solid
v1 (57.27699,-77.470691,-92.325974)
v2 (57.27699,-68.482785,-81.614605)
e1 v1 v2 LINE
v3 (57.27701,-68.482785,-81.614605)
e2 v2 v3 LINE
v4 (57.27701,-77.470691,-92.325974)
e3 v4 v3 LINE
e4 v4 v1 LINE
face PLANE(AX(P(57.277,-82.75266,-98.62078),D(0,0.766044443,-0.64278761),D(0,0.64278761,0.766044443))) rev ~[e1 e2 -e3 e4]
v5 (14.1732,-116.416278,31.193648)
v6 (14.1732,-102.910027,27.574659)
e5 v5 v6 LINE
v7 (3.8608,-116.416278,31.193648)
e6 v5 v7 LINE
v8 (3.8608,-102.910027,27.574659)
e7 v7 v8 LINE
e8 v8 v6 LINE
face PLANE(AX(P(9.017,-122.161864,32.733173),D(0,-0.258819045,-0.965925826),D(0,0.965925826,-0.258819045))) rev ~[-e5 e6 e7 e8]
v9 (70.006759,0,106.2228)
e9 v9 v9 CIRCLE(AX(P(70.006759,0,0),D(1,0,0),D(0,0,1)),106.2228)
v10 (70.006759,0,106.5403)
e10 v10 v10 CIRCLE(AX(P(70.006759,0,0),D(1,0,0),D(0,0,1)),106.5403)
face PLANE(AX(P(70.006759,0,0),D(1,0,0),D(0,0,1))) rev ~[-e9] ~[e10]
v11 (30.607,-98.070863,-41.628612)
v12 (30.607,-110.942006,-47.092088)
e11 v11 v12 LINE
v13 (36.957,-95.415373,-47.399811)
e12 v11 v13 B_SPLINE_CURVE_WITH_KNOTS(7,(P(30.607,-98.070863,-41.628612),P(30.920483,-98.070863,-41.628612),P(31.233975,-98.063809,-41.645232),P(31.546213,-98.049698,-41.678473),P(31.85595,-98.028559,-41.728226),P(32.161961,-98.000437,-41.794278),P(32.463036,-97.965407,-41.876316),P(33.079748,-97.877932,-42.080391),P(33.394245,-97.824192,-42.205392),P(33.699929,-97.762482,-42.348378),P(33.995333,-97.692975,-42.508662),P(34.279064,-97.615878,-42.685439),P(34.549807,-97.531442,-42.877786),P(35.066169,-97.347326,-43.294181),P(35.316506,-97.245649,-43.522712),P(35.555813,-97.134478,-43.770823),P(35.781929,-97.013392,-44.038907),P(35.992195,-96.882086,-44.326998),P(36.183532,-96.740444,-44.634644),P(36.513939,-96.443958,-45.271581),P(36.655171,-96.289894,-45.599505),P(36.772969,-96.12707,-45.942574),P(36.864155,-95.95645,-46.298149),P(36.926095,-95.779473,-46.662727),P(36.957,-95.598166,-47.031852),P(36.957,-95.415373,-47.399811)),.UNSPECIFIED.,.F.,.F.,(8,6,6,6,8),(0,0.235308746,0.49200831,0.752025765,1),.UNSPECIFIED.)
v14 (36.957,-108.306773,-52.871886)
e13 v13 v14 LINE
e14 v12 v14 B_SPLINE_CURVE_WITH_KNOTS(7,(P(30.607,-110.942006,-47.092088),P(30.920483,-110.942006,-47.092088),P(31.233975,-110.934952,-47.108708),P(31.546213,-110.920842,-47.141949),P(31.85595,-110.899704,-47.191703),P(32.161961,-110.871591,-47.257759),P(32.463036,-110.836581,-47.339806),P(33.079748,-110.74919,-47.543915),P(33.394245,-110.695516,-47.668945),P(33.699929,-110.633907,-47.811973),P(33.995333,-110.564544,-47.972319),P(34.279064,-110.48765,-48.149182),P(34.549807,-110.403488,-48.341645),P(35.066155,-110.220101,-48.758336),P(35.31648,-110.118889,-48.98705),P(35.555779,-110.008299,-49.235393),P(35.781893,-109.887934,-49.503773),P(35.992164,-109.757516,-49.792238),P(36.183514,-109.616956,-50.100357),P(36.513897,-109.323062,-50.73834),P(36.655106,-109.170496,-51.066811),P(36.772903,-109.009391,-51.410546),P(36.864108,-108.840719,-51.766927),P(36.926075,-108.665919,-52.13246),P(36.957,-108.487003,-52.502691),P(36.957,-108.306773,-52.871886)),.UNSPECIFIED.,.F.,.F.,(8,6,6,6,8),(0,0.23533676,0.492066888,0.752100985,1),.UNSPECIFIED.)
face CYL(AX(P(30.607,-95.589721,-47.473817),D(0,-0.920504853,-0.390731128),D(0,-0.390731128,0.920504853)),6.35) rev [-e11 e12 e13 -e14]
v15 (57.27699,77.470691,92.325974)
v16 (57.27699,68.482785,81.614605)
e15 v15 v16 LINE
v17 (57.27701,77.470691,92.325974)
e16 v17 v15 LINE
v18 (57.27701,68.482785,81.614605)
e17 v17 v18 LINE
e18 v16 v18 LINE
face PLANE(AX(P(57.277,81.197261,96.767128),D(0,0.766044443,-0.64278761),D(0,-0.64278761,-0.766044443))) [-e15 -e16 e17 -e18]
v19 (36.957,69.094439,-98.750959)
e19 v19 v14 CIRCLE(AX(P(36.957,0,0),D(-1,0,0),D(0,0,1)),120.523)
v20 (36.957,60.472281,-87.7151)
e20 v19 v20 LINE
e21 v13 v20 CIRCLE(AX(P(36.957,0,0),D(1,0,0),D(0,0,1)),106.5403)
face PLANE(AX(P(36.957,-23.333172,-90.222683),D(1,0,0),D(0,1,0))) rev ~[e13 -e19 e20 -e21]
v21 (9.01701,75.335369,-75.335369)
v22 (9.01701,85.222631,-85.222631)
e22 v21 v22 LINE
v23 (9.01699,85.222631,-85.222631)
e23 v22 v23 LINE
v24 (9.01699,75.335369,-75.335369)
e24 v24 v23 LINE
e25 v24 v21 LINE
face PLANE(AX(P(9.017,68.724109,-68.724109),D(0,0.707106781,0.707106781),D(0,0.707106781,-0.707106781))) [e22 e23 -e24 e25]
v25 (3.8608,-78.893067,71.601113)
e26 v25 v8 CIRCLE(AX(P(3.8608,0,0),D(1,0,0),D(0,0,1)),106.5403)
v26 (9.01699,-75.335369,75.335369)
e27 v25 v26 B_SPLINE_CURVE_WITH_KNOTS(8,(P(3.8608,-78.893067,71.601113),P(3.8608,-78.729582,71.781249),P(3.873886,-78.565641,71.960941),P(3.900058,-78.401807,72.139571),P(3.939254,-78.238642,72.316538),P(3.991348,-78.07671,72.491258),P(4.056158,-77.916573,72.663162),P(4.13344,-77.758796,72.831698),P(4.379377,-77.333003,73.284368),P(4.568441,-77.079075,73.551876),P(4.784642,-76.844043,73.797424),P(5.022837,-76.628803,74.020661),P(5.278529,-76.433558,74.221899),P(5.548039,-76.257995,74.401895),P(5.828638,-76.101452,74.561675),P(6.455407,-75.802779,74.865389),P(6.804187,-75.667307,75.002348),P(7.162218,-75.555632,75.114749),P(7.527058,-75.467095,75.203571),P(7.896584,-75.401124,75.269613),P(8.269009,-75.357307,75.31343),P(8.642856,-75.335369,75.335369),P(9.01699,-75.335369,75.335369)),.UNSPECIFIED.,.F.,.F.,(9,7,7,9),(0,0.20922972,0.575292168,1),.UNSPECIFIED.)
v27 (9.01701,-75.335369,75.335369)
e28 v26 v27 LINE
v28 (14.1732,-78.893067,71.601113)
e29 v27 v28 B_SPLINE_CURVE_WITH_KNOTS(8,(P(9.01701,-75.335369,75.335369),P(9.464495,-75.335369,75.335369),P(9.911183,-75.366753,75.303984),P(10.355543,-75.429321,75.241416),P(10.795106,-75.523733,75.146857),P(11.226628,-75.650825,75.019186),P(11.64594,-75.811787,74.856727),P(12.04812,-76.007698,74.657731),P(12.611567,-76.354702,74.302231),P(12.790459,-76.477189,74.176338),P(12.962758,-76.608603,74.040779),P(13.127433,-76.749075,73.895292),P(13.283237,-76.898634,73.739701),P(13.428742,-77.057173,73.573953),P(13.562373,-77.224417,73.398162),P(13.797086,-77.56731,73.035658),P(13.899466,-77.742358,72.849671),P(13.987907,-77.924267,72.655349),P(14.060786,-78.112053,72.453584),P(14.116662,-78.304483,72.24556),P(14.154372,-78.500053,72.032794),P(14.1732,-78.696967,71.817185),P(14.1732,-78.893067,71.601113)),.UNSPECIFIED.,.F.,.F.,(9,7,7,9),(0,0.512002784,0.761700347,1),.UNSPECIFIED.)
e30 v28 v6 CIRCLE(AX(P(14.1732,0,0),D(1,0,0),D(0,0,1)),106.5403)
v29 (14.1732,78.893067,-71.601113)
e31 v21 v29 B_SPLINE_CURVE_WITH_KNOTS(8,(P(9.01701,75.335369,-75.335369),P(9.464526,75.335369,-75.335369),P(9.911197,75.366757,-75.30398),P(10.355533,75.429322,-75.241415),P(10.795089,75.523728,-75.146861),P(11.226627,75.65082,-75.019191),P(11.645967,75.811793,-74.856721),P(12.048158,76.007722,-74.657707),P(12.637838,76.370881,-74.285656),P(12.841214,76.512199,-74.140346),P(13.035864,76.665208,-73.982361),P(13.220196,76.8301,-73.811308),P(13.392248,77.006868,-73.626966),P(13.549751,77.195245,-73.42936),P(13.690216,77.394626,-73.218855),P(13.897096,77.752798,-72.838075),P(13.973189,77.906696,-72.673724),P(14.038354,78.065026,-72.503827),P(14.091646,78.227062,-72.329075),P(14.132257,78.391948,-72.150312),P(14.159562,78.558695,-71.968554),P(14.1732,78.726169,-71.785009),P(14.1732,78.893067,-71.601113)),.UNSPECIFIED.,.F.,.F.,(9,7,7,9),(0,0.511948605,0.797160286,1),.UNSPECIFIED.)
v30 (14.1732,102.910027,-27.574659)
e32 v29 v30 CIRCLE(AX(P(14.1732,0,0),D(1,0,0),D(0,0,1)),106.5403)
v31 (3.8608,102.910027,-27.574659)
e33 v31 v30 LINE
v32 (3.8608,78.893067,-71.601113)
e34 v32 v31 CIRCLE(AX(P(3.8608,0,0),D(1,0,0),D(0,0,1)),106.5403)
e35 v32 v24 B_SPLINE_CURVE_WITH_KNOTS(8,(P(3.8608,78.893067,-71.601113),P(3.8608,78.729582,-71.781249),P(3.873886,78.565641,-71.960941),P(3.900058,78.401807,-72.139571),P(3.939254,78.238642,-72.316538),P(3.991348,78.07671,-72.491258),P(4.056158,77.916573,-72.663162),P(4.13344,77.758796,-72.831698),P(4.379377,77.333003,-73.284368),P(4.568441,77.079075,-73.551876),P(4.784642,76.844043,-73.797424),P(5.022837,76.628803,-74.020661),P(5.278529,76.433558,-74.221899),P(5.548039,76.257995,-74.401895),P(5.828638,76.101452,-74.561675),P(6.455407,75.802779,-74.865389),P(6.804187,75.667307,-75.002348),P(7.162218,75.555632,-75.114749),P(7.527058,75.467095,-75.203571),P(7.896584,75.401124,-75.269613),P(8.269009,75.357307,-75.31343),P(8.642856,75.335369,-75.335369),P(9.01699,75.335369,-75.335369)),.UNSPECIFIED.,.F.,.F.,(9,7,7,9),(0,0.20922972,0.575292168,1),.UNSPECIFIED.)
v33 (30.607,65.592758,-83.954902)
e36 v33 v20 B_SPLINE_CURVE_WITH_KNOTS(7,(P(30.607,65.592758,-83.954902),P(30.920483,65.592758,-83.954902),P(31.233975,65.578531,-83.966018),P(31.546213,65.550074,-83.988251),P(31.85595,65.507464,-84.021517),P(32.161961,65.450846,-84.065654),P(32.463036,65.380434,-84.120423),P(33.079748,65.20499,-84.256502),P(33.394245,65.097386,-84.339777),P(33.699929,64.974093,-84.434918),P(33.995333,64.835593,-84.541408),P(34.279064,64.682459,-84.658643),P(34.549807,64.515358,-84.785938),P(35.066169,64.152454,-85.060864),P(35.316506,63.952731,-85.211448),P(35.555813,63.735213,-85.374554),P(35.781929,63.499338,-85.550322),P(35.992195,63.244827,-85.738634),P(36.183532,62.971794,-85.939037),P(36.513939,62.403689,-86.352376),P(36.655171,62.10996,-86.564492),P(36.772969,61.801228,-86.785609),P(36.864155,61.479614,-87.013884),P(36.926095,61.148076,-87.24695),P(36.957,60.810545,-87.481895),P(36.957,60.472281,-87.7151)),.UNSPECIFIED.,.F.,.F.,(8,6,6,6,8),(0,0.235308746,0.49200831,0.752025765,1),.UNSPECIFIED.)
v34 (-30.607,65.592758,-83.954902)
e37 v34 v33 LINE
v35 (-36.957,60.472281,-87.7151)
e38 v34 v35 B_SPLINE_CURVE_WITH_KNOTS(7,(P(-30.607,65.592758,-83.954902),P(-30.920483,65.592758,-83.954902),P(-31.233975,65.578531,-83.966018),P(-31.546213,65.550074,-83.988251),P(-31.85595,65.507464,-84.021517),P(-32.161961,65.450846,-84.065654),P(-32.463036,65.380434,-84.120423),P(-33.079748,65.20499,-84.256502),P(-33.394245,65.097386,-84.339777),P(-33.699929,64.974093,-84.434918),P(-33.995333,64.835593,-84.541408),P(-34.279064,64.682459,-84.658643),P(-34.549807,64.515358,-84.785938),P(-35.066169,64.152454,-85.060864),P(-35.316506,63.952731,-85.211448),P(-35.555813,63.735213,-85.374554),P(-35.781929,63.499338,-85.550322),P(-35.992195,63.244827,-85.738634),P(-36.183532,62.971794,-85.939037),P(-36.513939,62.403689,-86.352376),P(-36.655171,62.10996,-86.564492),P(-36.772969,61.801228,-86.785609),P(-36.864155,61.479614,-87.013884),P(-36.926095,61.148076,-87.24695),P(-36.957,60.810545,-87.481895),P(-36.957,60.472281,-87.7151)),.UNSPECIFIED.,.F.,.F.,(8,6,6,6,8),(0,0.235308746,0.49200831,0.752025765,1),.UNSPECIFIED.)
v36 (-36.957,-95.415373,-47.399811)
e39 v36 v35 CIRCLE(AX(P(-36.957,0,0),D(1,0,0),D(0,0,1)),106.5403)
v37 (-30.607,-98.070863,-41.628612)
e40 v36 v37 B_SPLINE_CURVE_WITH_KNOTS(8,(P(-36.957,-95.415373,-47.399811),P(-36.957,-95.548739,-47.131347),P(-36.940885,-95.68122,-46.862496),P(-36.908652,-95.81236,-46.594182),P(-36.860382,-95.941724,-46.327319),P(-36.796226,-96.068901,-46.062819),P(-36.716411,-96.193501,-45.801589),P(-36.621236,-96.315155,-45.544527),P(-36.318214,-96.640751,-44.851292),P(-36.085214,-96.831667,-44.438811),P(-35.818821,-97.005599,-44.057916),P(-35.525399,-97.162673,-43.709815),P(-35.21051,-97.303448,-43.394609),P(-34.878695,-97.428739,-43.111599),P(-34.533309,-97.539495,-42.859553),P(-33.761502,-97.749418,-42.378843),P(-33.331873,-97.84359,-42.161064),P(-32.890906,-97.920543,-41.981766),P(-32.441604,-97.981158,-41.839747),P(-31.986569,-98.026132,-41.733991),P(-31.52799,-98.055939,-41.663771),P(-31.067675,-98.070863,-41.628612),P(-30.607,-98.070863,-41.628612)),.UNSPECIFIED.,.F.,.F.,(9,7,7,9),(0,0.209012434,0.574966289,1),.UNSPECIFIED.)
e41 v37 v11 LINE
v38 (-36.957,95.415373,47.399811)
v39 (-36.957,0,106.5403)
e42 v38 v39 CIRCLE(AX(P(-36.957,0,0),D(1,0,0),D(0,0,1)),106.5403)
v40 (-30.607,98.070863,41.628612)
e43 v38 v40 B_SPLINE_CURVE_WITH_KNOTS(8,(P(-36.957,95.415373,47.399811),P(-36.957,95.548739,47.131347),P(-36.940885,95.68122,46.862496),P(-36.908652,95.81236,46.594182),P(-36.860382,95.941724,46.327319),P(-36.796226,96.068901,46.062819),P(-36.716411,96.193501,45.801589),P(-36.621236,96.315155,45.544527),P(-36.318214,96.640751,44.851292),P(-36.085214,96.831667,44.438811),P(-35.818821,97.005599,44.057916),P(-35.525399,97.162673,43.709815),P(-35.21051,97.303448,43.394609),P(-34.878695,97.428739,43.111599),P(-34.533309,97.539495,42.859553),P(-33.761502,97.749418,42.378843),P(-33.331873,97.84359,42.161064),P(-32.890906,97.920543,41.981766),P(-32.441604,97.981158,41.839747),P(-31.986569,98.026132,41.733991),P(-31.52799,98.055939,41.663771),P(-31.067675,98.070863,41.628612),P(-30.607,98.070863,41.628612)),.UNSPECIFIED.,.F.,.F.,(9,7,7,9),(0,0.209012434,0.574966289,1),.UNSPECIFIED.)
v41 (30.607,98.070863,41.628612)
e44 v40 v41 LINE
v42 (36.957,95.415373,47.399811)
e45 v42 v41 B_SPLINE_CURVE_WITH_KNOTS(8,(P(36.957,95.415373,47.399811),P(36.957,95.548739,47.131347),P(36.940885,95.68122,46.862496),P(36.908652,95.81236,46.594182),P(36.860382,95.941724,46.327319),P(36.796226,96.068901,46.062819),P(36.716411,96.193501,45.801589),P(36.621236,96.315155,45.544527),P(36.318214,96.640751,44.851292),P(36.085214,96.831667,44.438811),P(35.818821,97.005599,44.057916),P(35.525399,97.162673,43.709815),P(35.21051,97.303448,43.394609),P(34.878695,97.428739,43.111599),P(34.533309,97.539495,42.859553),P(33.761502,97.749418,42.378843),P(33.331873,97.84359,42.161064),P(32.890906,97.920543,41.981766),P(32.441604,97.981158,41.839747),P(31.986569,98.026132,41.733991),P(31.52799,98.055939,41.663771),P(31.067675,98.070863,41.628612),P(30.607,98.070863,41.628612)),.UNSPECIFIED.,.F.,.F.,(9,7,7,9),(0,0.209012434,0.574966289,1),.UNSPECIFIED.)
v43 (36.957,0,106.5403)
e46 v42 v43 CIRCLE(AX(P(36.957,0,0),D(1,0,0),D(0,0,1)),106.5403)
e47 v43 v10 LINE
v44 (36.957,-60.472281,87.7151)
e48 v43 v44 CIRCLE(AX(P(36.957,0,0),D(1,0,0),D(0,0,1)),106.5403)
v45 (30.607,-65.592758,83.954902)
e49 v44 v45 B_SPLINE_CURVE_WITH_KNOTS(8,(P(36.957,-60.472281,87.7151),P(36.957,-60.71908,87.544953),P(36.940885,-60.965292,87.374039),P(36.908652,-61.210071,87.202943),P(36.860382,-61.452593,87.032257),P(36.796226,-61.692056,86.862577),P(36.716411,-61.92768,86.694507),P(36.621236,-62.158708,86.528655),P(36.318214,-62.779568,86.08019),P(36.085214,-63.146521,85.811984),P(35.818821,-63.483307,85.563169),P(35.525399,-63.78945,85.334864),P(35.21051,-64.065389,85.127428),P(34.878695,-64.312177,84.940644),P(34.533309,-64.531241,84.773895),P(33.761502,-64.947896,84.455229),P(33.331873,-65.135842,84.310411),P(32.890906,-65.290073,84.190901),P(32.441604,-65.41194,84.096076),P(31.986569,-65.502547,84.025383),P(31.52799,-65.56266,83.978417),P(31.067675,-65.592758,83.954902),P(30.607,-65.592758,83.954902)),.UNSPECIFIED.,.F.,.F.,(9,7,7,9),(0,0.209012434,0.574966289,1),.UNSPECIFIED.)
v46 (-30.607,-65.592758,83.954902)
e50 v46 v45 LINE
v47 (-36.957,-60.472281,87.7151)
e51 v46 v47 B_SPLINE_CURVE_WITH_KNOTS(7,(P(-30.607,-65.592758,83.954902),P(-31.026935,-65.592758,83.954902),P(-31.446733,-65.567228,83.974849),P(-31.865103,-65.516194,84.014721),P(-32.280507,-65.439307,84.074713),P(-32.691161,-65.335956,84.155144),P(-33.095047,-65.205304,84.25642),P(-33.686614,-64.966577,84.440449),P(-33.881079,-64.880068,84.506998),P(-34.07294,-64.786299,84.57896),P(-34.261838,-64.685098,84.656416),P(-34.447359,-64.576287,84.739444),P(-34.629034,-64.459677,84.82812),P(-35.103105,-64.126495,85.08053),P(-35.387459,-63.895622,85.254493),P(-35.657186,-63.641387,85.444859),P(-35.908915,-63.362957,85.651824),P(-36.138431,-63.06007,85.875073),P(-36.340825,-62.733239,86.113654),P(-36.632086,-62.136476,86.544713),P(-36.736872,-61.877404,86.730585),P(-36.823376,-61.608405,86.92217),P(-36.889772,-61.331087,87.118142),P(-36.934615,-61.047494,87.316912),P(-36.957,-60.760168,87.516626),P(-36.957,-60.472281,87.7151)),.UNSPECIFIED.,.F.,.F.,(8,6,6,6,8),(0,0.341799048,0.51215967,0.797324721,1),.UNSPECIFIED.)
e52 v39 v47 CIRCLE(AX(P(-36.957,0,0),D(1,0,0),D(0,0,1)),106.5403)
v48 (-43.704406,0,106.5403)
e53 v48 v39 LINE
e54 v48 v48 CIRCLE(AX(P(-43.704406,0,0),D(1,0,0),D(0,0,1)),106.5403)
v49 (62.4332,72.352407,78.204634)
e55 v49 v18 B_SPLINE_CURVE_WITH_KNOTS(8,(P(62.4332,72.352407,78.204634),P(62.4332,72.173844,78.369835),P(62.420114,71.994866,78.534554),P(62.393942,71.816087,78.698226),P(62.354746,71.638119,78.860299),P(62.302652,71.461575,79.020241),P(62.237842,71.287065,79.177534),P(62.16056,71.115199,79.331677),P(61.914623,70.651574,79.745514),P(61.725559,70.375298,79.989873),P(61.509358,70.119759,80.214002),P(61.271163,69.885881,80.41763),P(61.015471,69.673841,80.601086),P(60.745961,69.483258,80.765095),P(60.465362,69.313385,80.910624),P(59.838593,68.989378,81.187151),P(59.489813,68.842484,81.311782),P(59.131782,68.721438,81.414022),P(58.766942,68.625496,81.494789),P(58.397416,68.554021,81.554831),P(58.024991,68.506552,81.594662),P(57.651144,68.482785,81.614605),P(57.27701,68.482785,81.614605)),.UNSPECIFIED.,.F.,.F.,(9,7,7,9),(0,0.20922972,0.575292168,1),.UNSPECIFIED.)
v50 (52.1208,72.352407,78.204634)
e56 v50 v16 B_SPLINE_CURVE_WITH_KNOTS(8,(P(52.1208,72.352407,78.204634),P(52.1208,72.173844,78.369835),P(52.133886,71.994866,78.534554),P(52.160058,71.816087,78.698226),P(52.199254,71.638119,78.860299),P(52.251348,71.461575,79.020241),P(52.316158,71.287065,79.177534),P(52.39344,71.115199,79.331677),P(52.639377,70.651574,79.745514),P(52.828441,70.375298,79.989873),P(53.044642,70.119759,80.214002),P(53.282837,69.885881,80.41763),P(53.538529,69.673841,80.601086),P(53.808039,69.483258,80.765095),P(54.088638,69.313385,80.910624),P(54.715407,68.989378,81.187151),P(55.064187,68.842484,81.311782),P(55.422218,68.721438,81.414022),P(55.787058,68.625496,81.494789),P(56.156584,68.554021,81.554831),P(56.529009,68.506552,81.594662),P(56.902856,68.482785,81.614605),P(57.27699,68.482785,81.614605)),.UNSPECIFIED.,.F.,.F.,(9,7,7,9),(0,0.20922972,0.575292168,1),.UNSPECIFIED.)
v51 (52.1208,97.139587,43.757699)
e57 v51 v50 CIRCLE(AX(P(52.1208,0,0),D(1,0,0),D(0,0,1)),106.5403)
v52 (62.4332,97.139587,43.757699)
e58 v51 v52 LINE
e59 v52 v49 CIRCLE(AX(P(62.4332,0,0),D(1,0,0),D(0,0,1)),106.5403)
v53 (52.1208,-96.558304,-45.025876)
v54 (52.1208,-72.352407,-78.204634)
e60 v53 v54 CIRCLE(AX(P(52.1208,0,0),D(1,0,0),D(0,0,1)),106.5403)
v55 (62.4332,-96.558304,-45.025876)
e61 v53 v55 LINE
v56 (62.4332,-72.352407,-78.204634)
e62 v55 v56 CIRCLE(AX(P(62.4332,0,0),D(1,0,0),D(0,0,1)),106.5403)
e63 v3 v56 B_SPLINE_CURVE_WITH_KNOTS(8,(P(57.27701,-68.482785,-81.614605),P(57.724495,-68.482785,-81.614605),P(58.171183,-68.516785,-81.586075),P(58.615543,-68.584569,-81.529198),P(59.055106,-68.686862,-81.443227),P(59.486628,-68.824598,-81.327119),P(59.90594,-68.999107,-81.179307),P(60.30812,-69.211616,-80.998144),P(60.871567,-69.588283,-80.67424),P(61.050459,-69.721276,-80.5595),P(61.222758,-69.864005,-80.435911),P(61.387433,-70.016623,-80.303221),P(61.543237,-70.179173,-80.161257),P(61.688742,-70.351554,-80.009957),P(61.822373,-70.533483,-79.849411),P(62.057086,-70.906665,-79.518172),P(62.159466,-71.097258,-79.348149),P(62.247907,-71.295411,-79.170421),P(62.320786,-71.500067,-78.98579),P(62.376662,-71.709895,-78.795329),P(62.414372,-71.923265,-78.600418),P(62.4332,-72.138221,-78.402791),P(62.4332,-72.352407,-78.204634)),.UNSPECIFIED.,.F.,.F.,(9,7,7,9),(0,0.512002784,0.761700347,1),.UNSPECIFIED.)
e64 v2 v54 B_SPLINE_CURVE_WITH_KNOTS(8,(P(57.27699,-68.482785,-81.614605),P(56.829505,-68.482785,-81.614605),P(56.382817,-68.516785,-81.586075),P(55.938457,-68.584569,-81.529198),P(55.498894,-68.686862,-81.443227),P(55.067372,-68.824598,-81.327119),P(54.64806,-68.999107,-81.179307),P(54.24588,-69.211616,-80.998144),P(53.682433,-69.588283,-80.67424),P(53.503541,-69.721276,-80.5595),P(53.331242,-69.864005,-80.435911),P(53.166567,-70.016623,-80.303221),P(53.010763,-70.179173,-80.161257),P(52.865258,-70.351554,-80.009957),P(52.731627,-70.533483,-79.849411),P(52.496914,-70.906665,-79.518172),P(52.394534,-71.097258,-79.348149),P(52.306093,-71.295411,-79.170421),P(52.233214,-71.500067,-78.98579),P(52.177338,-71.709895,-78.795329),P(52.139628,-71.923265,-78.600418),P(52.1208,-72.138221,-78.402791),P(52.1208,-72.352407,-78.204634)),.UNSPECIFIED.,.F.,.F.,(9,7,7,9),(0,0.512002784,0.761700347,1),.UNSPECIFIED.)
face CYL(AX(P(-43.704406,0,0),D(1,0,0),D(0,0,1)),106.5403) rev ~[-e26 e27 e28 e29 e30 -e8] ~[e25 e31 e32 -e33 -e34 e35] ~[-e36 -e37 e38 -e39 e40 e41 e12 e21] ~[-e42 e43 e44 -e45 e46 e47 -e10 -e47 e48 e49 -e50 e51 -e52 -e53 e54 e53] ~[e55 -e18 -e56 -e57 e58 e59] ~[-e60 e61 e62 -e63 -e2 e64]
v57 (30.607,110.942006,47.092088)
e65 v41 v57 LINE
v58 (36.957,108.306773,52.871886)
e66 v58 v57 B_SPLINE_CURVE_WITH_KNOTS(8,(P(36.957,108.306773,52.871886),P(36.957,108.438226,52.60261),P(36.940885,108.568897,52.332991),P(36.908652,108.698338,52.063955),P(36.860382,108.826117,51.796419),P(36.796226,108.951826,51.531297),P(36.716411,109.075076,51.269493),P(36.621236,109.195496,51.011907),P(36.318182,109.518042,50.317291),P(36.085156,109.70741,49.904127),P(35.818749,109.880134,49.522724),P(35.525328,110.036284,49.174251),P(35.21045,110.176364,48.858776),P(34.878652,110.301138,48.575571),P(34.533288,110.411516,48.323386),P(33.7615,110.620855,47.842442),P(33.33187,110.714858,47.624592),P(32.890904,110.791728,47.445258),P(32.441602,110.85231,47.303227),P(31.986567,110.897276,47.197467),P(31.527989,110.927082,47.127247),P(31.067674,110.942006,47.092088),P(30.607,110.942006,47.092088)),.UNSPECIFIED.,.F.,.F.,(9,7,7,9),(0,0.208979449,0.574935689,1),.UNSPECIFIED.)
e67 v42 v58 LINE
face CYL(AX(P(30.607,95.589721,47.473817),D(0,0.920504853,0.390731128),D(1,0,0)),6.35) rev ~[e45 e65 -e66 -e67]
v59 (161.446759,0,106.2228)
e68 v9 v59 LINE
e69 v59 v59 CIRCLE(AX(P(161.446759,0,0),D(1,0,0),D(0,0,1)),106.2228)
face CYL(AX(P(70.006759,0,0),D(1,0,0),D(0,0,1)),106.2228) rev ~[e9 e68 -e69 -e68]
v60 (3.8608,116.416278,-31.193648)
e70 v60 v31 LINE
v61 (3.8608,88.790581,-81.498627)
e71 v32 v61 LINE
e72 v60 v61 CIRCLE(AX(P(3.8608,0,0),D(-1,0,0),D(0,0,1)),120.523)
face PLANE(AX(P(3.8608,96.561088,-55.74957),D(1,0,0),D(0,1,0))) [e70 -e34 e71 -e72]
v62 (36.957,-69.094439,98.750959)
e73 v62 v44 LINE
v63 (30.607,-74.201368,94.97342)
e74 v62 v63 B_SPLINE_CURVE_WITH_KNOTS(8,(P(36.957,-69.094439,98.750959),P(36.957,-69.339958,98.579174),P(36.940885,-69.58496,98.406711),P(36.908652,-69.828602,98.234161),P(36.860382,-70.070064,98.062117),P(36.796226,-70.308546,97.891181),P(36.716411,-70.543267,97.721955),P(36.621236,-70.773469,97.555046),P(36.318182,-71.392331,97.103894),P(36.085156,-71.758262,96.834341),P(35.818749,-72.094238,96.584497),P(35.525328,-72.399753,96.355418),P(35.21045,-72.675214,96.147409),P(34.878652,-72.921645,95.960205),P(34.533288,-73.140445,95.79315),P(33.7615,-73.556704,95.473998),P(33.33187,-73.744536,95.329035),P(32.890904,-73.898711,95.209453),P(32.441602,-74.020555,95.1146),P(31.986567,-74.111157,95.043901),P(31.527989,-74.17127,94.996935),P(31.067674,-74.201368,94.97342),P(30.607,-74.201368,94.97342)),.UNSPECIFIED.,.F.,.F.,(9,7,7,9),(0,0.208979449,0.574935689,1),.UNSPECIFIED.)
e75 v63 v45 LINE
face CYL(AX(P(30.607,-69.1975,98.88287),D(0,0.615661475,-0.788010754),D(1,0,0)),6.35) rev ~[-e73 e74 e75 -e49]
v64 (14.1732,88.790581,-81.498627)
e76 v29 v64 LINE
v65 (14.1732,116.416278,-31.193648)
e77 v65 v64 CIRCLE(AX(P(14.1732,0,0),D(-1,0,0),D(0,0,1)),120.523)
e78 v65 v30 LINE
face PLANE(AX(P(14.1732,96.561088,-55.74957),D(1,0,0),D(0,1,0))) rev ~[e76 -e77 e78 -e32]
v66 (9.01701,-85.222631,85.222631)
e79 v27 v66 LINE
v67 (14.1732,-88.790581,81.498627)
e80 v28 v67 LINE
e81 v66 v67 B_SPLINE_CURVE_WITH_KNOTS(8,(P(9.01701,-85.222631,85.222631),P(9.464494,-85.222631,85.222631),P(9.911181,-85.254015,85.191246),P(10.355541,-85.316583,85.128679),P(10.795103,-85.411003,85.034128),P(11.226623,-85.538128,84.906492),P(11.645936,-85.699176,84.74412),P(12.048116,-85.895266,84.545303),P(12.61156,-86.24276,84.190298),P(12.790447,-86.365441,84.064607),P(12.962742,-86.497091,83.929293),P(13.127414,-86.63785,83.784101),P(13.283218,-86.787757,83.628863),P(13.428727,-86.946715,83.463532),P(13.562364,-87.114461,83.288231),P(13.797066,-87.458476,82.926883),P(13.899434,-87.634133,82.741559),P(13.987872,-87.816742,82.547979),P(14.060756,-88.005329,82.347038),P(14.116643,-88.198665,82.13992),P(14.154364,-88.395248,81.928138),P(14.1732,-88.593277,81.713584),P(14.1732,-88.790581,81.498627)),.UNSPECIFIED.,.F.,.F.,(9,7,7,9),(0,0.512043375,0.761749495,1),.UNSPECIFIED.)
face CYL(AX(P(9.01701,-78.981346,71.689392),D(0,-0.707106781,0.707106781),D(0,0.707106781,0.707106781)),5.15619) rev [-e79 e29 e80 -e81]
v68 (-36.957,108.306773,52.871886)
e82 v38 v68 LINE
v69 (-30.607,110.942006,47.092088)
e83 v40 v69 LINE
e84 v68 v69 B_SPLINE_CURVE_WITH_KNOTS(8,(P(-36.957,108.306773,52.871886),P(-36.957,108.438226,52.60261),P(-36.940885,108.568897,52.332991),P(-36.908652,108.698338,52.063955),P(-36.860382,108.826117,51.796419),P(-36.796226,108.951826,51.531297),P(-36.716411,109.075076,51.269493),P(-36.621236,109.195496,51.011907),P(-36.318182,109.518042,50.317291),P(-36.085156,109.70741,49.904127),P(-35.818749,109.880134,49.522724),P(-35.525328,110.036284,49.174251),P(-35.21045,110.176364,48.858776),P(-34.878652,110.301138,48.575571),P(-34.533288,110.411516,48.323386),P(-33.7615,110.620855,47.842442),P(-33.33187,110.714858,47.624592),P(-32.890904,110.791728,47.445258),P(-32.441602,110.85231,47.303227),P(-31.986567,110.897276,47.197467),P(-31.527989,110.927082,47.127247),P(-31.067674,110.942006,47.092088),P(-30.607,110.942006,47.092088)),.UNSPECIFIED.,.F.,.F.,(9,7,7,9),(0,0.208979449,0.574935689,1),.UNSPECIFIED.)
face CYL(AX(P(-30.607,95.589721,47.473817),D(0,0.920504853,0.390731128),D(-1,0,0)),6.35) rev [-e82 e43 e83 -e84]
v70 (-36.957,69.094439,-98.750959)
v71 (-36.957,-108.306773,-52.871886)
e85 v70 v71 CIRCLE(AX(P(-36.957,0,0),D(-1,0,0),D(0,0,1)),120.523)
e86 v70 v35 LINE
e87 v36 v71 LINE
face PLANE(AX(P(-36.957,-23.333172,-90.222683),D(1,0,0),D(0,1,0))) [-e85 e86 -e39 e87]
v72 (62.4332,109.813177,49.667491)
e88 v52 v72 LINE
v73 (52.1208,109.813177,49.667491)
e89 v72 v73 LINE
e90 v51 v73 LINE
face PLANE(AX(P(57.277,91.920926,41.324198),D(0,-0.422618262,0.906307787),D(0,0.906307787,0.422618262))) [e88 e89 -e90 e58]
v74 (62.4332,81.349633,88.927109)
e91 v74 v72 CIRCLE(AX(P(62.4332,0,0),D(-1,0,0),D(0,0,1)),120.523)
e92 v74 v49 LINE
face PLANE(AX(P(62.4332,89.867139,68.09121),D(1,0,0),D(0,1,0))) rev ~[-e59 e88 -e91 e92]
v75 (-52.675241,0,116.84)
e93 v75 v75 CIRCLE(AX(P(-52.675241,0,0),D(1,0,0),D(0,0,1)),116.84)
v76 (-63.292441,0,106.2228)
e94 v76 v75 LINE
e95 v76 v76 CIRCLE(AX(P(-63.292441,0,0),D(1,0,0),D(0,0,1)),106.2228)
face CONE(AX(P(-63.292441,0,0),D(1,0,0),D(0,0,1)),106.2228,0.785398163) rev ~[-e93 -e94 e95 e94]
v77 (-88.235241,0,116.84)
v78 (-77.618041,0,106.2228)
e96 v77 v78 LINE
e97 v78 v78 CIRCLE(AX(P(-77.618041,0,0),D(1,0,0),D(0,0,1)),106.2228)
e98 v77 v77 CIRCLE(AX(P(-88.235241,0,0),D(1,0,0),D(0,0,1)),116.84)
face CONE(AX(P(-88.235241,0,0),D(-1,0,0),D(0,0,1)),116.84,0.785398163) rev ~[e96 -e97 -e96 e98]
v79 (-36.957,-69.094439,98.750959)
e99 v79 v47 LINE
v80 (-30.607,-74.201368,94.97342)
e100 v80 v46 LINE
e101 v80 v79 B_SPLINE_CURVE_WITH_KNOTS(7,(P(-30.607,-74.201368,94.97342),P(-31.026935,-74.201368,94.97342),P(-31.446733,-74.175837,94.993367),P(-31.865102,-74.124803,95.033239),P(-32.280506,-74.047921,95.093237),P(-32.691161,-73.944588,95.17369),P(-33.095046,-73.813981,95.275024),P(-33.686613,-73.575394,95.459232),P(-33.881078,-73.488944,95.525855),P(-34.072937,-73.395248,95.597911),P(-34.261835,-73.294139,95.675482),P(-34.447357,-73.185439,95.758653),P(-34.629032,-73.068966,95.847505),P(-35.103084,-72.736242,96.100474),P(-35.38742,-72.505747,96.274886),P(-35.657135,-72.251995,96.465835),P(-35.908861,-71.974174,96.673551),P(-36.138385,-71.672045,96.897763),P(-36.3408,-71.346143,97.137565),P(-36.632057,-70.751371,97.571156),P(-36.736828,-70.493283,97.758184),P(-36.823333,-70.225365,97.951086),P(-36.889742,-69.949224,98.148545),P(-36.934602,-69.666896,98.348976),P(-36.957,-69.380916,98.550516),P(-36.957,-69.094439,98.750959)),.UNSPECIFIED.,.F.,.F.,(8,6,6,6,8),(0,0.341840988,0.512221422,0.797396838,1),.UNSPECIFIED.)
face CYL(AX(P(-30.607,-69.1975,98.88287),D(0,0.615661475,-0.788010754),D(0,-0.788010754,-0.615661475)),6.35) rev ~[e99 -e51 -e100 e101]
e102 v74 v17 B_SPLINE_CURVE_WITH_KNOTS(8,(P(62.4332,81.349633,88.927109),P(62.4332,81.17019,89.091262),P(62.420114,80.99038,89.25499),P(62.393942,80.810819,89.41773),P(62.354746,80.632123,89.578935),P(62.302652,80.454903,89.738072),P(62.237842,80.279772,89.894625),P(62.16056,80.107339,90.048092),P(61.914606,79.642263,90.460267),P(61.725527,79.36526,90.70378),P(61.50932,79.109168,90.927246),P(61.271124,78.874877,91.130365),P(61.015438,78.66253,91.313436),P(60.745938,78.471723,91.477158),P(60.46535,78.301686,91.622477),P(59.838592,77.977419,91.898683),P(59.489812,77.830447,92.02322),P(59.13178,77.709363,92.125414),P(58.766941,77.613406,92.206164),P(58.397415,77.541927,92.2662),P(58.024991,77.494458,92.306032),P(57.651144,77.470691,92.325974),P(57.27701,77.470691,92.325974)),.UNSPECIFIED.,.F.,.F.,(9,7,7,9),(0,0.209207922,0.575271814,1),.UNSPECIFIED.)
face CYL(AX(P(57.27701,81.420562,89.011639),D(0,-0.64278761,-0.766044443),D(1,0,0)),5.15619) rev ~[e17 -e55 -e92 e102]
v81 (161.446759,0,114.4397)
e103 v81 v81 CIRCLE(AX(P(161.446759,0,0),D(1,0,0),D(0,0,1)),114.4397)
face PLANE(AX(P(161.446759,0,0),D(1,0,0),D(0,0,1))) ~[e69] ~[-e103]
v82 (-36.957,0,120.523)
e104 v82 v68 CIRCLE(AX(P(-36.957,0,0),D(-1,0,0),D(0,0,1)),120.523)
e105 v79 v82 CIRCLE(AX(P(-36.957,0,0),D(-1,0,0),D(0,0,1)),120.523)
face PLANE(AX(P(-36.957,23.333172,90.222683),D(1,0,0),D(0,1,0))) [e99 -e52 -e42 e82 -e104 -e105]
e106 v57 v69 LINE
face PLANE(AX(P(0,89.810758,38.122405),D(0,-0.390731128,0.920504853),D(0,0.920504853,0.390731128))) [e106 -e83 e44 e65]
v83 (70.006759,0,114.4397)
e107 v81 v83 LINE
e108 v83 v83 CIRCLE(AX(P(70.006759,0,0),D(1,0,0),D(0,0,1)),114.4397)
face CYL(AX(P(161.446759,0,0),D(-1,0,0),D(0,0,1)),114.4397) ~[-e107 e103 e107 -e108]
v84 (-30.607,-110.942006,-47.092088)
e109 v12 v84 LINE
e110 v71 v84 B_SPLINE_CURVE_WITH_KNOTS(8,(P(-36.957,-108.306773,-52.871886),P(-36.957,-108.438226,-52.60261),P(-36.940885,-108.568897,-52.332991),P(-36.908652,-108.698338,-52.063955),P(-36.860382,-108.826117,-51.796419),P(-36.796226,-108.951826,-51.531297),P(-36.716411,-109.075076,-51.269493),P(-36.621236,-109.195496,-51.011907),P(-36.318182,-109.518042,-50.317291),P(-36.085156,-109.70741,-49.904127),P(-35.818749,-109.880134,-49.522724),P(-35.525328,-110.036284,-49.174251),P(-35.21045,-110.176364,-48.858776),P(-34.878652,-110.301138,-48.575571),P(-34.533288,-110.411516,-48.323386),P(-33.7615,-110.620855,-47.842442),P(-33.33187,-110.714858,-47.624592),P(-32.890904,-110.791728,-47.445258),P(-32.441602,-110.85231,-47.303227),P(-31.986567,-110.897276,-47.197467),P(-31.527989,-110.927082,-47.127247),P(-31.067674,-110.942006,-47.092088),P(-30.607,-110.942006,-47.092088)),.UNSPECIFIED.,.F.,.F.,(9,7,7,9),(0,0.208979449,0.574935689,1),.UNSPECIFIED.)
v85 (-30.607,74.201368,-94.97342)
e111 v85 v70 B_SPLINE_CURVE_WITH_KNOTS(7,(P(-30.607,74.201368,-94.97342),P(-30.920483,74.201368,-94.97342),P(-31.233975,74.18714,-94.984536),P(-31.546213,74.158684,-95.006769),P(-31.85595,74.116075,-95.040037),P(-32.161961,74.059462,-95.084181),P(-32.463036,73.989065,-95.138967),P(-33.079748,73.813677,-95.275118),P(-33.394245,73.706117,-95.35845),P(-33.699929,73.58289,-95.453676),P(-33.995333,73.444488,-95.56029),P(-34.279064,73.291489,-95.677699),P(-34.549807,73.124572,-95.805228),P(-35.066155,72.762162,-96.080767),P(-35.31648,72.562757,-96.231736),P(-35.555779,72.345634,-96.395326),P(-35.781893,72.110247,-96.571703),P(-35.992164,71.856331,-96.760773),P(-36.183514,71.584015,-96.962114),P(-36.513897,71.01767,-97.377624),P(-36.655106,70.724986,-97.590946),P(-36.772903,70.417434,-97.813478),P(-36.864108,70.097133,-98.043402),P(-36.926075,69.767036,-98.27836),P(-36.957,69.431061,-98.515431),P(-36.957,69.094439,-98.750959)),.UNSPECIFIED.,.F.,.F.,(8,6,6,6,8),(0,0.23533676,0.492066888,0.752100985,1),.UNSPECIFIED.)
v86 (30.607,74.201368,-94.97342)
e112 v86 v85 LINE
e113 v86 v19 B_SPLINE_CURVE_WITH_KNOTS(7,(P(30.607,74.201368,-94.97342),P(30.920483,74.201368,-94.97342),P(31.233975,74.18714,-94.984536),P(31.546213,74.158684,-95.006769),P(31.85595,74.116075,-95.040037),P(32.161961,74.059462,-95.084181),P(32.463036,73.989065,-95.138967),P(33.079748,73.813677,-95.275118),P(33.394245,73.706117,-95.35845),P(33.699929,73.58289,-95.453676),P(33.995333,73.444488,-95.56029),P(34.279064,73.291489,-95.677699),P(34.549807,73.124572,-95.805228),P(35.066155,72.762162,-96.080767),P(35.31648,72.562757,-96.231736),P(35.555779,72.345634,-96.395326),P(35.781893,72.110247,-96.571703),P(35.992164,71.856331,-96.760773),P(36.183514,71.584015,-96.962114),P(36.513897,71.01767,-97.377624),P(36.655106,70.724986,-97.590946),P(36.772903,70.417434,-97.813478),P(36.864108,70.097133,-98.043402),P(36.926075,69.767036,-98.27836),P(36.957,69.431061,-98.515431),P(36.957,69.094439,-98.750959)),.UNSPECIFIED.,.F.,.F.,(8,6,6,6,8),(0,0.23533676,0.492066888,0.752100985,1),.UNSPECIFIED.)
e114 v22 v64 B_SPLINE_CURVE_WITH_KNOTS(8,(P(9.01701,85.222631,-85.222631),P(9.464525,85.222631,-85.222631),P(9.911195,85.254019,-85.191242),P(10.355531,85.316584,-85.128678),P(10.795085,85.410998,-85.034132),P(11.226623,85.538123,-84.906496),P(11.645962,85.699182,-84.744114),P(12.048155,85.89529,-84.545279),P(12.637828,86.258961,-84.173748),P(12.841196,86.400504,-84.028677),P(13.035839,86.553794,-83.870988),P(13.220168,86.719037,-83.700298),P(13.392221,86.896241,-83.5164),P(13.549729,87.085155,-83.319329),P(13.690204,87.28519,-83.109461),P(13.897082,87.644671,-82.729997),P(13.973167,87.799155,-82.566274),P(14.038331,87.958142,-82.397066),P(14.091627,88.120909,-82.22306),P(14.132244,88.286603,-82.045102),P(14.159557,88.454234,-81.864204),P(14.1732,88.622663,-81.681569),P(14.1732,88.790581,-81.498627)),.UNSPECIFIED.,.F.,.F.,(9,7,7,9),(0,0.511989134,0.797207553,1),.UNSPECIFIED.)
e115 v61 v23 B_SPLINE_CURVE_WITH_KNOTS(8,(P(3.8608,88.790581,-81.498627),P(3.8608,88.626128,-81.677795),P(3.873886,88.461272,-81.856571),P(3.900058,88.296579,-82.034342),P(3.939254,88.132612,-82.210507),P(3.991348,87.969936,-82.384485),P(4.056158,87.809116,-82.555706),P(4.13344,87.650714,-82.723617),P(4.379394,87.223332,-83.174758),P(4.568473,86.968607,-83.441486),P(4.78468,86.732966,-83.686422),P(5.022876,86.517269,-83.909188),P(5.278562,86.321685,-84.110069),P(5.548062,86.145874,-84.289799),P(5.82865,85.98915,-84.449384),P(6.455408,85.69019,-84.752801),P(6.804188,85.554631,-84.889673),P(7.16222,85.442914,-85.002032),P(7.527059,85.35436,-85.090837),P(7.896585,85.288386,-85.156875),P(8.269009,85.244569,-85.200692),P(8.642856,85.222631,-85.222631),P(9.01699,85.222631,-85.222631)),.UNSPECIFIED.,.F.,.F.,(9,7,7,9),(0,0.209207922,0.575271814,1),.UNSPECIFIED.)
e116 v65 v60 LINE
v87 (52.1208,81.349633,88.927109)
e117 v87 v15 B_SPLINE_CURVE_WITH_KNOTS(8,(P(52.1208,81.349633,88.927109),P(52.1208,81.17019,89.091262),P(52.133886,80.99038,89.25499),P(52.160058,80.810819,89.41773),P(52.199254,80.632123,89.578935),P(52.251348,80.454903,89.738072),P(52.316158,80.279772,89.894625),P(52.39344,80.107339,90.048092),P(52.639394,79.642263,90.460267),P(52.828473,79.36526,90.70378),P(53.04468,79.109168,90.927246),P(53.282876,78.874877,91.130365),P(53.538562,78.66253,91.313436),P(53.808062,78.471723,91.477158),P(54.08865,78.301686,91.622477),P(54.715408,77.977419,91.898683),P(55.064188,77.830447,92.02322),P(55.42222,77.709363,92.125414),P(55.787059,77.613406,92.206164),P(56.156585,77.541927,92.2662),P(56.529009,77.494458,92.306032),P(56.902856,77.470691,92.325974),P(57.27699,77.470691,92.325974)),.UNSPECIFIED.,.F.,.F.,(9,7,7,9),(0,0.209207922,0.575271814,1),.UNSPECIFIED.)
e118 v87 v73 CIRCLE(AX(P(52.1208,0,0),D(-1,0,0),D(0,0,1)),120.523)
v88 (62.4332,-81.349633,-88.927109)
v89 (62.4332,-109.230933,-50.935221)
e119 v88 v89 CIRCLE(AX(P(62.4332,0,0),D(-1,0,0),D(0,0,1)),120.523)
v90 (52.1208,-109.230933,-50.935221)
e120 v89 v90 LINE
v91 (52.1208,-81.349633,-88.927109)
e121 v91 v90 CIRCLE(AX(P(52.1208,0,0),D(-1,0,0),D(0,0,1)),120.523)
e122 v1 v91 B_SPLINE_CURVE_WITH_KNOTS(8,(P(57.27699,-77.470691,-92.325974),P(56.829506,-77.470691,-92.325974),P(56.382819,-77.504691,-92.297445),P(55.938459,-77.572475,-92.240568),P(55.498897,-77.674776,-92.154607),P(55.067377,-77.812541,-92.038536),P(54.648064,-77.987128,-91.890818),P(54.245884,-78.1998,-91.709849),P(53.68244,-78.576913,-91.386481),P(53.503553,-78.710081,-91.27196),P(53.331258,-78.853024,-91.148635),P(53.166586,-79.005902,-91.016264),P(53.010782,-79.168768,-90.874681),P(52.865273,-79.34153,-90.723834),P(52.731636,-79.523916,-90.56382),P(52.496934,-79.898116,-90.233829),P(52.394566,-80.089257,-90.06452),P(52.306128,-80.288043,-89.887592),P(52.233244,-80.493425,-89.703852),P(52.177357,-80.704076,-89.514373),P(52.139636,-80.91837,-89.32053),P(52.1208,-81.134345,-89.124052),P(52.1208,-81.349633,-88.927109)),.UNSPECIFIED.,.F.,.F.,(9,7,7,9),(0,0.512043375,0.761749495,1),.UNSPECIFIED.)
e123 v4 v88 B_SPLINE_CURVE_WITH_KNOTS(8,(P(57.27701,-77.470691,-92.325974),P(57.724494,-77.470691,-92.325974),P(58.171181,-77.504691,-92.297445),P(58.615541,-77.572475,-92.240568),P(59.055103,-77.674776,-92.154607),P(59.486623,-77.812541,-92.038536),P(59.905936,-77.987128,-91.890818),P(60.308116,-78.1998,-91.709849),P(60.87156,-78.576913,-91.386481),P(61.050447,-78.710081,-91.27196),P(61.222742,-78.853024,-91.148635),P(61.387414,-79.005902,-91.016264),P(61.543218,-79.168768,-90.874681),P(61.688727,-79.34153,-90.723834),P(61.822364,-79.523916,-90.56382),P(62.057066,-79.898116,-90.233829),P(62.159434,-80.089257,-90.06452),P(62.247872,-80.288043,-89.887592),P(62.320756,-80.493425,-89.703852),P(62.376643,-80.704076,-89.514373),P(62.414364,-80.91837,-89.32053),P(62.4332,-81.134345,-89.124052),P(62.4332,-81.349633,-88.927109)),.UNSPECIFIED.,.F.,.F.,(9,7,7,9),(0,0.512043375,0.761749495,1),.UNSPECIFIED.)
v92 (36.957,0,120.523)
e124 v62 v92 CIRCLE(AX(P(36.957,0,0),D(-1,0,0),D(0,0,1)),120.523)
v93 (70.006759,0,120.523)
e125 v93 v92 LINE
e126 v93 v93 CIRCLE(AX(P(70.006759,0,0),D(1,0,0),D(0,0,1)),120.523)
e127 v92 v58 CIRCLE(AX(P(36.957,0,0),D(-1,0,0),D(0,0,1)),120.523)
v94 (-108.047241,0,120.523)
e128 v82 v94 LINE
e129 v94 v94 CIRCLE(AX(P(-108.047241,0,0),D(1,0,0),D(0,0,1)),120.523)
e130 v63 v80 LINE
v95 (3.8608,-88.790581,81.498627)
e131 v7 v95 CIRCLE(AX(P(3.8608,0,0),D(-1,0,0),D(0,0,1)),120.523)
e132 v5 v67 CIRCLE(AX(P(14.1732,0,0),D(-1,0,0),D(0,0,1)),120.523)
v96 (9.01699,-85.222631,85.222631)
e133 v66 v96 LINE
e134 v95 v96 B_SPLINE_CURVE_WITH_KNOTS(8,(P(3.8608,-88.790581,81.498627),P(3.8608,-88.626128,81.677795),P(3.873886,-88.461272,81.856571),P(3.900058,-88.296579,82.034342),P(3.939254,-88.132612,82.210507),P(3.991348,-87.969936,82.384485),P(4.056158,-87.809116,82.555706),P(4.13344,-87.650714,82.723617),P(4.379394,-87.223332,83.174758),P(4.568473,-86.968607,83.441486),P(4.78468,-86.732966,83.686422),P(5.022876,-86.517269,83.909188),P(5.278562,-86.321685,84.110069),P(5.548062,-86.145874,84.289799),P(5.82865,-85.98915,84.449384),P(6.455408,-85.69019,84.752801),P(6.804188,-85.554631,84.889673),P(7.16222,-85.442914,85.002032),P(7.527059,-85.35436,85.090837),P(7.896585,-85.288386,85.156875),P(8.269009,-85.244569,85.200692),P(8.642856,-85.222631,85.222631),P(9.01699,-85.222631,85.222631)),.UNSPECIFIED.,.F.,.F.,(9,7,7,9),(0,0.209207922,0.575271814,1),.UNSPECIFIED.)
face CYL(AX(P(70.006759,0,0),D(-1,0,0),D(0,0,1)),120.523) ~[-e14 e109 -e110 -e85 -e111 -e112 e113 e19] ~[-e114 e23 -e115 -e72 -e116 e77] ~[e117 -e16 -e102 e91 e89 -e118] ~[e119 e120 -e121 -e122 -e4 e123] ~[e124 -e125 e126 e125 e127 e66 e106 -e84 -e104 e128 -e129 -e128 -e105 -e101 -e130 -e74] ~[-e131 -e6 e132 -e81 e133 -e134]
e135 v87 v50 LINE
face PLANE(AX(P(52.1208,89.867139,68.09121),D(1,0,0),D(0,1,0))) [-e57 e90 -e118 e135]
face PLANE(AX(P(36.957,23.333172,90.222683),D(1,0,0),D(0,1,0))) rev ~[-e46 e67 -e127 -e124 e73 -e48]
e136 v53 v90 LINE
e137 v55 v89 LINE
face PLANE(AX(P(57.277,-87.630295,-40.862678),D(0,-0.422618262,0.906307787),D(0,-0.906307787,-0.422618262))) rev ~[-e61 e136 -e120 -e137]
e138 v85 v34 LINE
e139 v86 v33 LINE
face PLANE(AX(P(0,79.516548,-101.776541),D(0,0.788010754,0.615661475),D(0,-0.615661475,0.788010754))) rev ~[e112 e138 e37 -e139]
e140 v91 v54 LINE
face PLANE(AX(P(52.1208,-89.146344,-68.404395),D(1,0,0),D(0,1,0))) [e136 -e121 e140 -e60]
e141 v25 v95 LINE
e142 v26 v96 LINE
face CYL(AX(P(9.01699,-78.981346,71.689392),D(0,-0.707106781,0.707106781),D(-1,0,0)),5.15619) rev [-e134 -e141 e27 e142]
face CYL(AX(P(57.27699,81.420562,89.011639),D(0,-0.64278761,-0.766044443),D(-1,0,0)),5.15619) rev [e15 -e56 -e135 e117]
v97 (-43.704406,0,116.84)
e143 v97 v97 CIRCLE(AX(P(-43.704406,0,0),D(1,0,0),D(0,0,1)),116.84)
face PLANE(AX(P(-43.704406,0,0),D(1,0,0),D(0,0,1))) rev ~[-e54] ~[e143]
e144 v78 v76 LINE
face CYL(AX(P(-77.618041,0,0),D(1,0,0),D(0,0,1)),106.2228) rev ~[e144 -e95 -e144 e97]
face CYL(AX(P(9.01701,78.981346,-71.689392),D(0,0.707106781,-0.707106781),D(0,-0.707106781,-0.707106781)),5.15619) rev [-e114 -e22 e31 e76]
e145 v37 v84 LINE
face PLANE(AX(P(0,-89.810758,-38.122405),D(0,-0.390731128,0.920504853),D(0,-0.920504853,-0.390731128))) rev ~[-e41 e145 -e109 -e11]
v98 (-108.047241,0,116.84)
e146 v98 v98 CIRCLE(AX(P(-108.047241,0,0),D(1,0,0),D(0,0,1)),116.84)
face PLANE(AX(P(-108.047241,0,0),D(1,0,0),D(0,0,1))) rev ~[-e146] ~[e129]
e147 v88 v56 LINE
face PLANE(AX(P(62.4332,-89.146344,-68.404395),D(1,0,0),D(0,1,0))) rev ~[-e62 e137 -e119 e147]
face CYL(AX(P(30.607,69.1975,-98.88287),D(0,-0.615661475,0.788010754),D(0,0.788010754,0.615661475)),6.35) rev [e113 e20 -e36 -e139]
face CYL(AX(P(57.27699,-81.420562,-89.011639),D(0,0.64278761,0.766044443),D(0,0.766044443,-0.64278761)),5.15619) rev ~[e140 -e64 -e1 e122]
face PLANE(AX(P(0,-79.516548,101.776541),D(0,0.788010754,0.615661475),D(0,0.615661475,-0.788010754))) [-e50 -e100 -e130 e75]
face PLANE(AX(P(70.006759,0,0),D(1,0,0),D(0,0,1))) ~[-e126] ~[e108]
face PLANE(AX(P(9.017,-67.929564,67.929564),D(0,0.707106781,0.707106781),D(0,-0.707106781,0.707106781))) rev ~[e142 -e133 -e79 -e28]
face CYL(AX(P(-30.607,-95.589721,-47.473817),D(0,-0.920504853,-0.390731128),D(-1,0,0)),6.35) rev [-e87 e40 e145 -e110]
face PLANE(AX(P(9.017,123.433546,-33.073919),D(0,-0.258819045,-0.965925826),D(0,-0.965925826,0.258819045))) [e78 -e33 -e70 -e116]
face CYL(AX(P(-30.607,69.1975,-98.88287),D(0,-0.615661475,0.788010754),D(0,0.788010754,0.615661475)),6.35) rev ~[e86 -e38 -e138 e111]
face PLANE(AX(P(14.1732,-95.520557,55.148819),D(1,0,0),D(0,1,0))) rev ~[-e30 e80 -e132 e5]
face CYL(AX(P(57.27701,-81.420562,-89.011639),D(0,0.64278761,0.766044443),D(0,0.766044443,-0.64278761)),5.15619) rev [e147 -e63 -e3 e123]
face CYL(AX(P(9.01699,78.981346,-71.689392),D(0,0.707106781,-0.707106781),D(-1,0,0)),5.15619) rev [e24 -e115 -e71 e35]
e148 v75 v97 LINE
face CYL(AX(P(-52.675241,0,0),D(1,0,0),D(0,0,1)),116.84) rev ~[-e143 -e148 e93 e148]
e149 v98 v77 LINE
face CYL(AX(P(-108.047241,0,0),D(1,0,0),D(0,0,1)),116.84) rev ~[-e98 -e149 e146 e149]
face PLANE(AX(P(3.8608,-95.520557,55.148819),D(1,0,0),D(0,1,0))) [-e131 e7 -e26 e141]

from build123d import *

# Parameters (mm, degrees)
F3_DEPTH  = 36.957
F4_R      = 6.35
F7_DEPTH  = 5.1562
F8_R      = 5.15619
F11_DEPTH = 5.1562
F12_R     = 5.15619


# Not quite as in the source:
# - a fillet or chamfer is up to 0.001 mm smaller than in the source, because OpenCascade refuses the exact size


with BuildPart() as f1:
    # F0 (on Front) → F1 (revolve)
    with BuildSketch(Plane.XZ):
        Polygon((-88.2352406061, 116.84), (-77.6180406061, 106.2228), (-63.2924406061, 106.2228), (-52.6752406061, 116.84), (-43.7044062913, 116.84), (-43.7044062913, 106.5403), (70.0067593939, 106.5403), (70.0067593939, 106.2228), (161.4467593939, 106.2228), (161.4467593939, 114.4397), (70.0067593939, 114.4397), (70.0067593939, 120.523), (-108.0472406061, 120.523), (-108.0472406061, 116.84), align=None)
    revolve(axis=Axis((26.6997593939, 0, 0), (1, 0, 0)))

    # F2 (on Right) → F3 (cut, symmetric)
    with BuildSketch(Plane.YZ):
        with BuildLine():
            Line((-79.5165483207, 101.776540644), (-60.0681501855, 76.8837261913))
            ThreePointArc((-60.0681501855, 76.8837261913), (24.428788043, 94.4591146185), (89.8107580216, 38.1224050048))
            Line((89.8107580216, 38.1224050048), (118.8889862246, 50.465380577))
            ThreePointArc((118.8889862246, 50.465380577), (32.3381508976, 125.0423515407), (-79.5165483207, 101.776540644))
        make_face()
        with BuildLine():
            ThreePointArc((60.0681501855, -76.8837261913), (-24.428788043, -94.4591146185), (-89.8107580216, -38.1224050048))
            Line((-89.8107580216, -38.1224050048), (-118.8889862246, -50.465380577))
            ThreePointArc((-118.8889862246, -50.465380577), (-32.3381508976, -125.0423515407), (79.5165483207, -101.776540644))
            Line((79.5165483207, -101.776540644), (60.0681501855, -76.8837261913))
        make_face()
    extrude(amount=F3_DEPTH, both=True, mode=Mode.SUBTRACT)

    # F4
    f4_edges = [f1.edges().sort_by_distance(p)[0] for p in [
        (36.957, -69.897063, 89.464161),
        (-36.957, -69.897063, 89.464161),
        (-36.957, 104.506435, 44.36035),
        (36.957, 104.506435, 44.36035),
        (36.957, -104.506435, -44.36035),
        (36.957, 69.897063, -89.464161),
        (-36.957, -104.506435, -44.36035),
        (-36.957, 69.897063, -89.464161),
    ]]
    fillet(f4_edges, radius=F4_R)

    # F6 (on offset) → F7 (cut, symmetric)
    with BuildSketch(Plane.YZ.offset(9.017)):
        with BuildLine():
            ThreePointArc((93.8788780653, -25.1547695639), (84.169499428, -48.5952831523), (68.7241085014, -68.7241085014))
            Line((68.7241085014, -68.7241085014), (90.3596269568, -90.3596269568))
            ThreePointArc((90.3596269568, -90.3596269568), (110.6674896962, -63.8939049666), (123.4335458995, -33.0739189427))
            Line((123.4335458995, -33.0739189427), (93.8788780653, -25.1547695639))
        make_face()
        with BuildLine():
            ThreePointArc((-92.7935106347, 24.8639462374), (-83.1963856114, 48.0334556284), (-67.9295643973, 67.9295643973))
            Line((-67.9295643973, 67.9295643973), (-89.4286909818, 89.4286909818))
            ThreePointArc((-89.4286909818, 89.4286909818), (-109.5273306353, 63.2356338259), (-122.1618637084, 32.7331727265))
            Line((-122.1618637084, 32.7331727265), (-92.7935106347, 24.8639462374))
        make_face()
    extrude(amount=F7_DEPTH, both=True, mode=Mode.SUBTRACT)

    # F8 (radius 5.1562 in the source; OpenCascade refuses exactly that, so slightly less here)
    f8_edges = [f1.edges().sort_by_distance(p)[0] for p in [
        (14.1732, 80.279, -80.279),
        (3.8608, 80.279, -80.279),
        (3.8608, -80.279, 80.279),
        (14.1732, -80.279, 80.279),
    ]]
    fillet(f8_edges, radius=F8_R)

    # F10 (on offset) → F11 (cut, symmetric)
    with BuildSketch(Plane.YZ.offset(57.277)):
        with BuildLine():
            ThreePointArc((64.781849813, 77.2040022495), (80.3789780557, 60.7977459719), (91.9209264172, 41.3241976951))
            Line((91.9209264172, 41.3241976951), (115.0678452351, 52.1177832026))
            ThreePointArc((115.0678452351, 52.1177832026), (100.6398977696, 76.3445041239), (81.1972614412, 96.7671280314))
            Line((81.1972614412, 96.7671280314), (64.781849813, 77.2040022495))
        make_face()
        with BuildLine():
            ThreePointArc((-62.1507050275, -74.0683259988), (-76.7088050422, -58.8607363245), (-87.6302951199, -40.8626777008))
            Line((-87.6302951199, -40.8626777008), (-116.6783232789, -54.4079956856))
            ThreePointArc((-116.6783232789, -54.4079956856), (-102.1365355533, -78.3721201887), (-82.7526604046, -98.6207803339))
            Line((-82.7526604046, -98.6207803339), (-62.1507050275, -74.0683259988))
        make_face()
    extrude(amount=F11_DEPTH, both=True, mode=Mode.SUBTRACT)

    # F12 (radius 5.1562 in the source; OpenCascade refuses exactly that, so slightly less here)
    f12_edges = [f1.edges().sort_by_distance(p)[0] for p in [
        (62.4332, 72.976738, 86.97029),
        (52.1208, 72.976738, 86.97029),
        (62.4332, -72.976738, -86.97029),
        (52.1208, -72.976738, -86.97029),
    ]]
    fillet(f12_edges, radius=F12_R)


solid = f1.part
